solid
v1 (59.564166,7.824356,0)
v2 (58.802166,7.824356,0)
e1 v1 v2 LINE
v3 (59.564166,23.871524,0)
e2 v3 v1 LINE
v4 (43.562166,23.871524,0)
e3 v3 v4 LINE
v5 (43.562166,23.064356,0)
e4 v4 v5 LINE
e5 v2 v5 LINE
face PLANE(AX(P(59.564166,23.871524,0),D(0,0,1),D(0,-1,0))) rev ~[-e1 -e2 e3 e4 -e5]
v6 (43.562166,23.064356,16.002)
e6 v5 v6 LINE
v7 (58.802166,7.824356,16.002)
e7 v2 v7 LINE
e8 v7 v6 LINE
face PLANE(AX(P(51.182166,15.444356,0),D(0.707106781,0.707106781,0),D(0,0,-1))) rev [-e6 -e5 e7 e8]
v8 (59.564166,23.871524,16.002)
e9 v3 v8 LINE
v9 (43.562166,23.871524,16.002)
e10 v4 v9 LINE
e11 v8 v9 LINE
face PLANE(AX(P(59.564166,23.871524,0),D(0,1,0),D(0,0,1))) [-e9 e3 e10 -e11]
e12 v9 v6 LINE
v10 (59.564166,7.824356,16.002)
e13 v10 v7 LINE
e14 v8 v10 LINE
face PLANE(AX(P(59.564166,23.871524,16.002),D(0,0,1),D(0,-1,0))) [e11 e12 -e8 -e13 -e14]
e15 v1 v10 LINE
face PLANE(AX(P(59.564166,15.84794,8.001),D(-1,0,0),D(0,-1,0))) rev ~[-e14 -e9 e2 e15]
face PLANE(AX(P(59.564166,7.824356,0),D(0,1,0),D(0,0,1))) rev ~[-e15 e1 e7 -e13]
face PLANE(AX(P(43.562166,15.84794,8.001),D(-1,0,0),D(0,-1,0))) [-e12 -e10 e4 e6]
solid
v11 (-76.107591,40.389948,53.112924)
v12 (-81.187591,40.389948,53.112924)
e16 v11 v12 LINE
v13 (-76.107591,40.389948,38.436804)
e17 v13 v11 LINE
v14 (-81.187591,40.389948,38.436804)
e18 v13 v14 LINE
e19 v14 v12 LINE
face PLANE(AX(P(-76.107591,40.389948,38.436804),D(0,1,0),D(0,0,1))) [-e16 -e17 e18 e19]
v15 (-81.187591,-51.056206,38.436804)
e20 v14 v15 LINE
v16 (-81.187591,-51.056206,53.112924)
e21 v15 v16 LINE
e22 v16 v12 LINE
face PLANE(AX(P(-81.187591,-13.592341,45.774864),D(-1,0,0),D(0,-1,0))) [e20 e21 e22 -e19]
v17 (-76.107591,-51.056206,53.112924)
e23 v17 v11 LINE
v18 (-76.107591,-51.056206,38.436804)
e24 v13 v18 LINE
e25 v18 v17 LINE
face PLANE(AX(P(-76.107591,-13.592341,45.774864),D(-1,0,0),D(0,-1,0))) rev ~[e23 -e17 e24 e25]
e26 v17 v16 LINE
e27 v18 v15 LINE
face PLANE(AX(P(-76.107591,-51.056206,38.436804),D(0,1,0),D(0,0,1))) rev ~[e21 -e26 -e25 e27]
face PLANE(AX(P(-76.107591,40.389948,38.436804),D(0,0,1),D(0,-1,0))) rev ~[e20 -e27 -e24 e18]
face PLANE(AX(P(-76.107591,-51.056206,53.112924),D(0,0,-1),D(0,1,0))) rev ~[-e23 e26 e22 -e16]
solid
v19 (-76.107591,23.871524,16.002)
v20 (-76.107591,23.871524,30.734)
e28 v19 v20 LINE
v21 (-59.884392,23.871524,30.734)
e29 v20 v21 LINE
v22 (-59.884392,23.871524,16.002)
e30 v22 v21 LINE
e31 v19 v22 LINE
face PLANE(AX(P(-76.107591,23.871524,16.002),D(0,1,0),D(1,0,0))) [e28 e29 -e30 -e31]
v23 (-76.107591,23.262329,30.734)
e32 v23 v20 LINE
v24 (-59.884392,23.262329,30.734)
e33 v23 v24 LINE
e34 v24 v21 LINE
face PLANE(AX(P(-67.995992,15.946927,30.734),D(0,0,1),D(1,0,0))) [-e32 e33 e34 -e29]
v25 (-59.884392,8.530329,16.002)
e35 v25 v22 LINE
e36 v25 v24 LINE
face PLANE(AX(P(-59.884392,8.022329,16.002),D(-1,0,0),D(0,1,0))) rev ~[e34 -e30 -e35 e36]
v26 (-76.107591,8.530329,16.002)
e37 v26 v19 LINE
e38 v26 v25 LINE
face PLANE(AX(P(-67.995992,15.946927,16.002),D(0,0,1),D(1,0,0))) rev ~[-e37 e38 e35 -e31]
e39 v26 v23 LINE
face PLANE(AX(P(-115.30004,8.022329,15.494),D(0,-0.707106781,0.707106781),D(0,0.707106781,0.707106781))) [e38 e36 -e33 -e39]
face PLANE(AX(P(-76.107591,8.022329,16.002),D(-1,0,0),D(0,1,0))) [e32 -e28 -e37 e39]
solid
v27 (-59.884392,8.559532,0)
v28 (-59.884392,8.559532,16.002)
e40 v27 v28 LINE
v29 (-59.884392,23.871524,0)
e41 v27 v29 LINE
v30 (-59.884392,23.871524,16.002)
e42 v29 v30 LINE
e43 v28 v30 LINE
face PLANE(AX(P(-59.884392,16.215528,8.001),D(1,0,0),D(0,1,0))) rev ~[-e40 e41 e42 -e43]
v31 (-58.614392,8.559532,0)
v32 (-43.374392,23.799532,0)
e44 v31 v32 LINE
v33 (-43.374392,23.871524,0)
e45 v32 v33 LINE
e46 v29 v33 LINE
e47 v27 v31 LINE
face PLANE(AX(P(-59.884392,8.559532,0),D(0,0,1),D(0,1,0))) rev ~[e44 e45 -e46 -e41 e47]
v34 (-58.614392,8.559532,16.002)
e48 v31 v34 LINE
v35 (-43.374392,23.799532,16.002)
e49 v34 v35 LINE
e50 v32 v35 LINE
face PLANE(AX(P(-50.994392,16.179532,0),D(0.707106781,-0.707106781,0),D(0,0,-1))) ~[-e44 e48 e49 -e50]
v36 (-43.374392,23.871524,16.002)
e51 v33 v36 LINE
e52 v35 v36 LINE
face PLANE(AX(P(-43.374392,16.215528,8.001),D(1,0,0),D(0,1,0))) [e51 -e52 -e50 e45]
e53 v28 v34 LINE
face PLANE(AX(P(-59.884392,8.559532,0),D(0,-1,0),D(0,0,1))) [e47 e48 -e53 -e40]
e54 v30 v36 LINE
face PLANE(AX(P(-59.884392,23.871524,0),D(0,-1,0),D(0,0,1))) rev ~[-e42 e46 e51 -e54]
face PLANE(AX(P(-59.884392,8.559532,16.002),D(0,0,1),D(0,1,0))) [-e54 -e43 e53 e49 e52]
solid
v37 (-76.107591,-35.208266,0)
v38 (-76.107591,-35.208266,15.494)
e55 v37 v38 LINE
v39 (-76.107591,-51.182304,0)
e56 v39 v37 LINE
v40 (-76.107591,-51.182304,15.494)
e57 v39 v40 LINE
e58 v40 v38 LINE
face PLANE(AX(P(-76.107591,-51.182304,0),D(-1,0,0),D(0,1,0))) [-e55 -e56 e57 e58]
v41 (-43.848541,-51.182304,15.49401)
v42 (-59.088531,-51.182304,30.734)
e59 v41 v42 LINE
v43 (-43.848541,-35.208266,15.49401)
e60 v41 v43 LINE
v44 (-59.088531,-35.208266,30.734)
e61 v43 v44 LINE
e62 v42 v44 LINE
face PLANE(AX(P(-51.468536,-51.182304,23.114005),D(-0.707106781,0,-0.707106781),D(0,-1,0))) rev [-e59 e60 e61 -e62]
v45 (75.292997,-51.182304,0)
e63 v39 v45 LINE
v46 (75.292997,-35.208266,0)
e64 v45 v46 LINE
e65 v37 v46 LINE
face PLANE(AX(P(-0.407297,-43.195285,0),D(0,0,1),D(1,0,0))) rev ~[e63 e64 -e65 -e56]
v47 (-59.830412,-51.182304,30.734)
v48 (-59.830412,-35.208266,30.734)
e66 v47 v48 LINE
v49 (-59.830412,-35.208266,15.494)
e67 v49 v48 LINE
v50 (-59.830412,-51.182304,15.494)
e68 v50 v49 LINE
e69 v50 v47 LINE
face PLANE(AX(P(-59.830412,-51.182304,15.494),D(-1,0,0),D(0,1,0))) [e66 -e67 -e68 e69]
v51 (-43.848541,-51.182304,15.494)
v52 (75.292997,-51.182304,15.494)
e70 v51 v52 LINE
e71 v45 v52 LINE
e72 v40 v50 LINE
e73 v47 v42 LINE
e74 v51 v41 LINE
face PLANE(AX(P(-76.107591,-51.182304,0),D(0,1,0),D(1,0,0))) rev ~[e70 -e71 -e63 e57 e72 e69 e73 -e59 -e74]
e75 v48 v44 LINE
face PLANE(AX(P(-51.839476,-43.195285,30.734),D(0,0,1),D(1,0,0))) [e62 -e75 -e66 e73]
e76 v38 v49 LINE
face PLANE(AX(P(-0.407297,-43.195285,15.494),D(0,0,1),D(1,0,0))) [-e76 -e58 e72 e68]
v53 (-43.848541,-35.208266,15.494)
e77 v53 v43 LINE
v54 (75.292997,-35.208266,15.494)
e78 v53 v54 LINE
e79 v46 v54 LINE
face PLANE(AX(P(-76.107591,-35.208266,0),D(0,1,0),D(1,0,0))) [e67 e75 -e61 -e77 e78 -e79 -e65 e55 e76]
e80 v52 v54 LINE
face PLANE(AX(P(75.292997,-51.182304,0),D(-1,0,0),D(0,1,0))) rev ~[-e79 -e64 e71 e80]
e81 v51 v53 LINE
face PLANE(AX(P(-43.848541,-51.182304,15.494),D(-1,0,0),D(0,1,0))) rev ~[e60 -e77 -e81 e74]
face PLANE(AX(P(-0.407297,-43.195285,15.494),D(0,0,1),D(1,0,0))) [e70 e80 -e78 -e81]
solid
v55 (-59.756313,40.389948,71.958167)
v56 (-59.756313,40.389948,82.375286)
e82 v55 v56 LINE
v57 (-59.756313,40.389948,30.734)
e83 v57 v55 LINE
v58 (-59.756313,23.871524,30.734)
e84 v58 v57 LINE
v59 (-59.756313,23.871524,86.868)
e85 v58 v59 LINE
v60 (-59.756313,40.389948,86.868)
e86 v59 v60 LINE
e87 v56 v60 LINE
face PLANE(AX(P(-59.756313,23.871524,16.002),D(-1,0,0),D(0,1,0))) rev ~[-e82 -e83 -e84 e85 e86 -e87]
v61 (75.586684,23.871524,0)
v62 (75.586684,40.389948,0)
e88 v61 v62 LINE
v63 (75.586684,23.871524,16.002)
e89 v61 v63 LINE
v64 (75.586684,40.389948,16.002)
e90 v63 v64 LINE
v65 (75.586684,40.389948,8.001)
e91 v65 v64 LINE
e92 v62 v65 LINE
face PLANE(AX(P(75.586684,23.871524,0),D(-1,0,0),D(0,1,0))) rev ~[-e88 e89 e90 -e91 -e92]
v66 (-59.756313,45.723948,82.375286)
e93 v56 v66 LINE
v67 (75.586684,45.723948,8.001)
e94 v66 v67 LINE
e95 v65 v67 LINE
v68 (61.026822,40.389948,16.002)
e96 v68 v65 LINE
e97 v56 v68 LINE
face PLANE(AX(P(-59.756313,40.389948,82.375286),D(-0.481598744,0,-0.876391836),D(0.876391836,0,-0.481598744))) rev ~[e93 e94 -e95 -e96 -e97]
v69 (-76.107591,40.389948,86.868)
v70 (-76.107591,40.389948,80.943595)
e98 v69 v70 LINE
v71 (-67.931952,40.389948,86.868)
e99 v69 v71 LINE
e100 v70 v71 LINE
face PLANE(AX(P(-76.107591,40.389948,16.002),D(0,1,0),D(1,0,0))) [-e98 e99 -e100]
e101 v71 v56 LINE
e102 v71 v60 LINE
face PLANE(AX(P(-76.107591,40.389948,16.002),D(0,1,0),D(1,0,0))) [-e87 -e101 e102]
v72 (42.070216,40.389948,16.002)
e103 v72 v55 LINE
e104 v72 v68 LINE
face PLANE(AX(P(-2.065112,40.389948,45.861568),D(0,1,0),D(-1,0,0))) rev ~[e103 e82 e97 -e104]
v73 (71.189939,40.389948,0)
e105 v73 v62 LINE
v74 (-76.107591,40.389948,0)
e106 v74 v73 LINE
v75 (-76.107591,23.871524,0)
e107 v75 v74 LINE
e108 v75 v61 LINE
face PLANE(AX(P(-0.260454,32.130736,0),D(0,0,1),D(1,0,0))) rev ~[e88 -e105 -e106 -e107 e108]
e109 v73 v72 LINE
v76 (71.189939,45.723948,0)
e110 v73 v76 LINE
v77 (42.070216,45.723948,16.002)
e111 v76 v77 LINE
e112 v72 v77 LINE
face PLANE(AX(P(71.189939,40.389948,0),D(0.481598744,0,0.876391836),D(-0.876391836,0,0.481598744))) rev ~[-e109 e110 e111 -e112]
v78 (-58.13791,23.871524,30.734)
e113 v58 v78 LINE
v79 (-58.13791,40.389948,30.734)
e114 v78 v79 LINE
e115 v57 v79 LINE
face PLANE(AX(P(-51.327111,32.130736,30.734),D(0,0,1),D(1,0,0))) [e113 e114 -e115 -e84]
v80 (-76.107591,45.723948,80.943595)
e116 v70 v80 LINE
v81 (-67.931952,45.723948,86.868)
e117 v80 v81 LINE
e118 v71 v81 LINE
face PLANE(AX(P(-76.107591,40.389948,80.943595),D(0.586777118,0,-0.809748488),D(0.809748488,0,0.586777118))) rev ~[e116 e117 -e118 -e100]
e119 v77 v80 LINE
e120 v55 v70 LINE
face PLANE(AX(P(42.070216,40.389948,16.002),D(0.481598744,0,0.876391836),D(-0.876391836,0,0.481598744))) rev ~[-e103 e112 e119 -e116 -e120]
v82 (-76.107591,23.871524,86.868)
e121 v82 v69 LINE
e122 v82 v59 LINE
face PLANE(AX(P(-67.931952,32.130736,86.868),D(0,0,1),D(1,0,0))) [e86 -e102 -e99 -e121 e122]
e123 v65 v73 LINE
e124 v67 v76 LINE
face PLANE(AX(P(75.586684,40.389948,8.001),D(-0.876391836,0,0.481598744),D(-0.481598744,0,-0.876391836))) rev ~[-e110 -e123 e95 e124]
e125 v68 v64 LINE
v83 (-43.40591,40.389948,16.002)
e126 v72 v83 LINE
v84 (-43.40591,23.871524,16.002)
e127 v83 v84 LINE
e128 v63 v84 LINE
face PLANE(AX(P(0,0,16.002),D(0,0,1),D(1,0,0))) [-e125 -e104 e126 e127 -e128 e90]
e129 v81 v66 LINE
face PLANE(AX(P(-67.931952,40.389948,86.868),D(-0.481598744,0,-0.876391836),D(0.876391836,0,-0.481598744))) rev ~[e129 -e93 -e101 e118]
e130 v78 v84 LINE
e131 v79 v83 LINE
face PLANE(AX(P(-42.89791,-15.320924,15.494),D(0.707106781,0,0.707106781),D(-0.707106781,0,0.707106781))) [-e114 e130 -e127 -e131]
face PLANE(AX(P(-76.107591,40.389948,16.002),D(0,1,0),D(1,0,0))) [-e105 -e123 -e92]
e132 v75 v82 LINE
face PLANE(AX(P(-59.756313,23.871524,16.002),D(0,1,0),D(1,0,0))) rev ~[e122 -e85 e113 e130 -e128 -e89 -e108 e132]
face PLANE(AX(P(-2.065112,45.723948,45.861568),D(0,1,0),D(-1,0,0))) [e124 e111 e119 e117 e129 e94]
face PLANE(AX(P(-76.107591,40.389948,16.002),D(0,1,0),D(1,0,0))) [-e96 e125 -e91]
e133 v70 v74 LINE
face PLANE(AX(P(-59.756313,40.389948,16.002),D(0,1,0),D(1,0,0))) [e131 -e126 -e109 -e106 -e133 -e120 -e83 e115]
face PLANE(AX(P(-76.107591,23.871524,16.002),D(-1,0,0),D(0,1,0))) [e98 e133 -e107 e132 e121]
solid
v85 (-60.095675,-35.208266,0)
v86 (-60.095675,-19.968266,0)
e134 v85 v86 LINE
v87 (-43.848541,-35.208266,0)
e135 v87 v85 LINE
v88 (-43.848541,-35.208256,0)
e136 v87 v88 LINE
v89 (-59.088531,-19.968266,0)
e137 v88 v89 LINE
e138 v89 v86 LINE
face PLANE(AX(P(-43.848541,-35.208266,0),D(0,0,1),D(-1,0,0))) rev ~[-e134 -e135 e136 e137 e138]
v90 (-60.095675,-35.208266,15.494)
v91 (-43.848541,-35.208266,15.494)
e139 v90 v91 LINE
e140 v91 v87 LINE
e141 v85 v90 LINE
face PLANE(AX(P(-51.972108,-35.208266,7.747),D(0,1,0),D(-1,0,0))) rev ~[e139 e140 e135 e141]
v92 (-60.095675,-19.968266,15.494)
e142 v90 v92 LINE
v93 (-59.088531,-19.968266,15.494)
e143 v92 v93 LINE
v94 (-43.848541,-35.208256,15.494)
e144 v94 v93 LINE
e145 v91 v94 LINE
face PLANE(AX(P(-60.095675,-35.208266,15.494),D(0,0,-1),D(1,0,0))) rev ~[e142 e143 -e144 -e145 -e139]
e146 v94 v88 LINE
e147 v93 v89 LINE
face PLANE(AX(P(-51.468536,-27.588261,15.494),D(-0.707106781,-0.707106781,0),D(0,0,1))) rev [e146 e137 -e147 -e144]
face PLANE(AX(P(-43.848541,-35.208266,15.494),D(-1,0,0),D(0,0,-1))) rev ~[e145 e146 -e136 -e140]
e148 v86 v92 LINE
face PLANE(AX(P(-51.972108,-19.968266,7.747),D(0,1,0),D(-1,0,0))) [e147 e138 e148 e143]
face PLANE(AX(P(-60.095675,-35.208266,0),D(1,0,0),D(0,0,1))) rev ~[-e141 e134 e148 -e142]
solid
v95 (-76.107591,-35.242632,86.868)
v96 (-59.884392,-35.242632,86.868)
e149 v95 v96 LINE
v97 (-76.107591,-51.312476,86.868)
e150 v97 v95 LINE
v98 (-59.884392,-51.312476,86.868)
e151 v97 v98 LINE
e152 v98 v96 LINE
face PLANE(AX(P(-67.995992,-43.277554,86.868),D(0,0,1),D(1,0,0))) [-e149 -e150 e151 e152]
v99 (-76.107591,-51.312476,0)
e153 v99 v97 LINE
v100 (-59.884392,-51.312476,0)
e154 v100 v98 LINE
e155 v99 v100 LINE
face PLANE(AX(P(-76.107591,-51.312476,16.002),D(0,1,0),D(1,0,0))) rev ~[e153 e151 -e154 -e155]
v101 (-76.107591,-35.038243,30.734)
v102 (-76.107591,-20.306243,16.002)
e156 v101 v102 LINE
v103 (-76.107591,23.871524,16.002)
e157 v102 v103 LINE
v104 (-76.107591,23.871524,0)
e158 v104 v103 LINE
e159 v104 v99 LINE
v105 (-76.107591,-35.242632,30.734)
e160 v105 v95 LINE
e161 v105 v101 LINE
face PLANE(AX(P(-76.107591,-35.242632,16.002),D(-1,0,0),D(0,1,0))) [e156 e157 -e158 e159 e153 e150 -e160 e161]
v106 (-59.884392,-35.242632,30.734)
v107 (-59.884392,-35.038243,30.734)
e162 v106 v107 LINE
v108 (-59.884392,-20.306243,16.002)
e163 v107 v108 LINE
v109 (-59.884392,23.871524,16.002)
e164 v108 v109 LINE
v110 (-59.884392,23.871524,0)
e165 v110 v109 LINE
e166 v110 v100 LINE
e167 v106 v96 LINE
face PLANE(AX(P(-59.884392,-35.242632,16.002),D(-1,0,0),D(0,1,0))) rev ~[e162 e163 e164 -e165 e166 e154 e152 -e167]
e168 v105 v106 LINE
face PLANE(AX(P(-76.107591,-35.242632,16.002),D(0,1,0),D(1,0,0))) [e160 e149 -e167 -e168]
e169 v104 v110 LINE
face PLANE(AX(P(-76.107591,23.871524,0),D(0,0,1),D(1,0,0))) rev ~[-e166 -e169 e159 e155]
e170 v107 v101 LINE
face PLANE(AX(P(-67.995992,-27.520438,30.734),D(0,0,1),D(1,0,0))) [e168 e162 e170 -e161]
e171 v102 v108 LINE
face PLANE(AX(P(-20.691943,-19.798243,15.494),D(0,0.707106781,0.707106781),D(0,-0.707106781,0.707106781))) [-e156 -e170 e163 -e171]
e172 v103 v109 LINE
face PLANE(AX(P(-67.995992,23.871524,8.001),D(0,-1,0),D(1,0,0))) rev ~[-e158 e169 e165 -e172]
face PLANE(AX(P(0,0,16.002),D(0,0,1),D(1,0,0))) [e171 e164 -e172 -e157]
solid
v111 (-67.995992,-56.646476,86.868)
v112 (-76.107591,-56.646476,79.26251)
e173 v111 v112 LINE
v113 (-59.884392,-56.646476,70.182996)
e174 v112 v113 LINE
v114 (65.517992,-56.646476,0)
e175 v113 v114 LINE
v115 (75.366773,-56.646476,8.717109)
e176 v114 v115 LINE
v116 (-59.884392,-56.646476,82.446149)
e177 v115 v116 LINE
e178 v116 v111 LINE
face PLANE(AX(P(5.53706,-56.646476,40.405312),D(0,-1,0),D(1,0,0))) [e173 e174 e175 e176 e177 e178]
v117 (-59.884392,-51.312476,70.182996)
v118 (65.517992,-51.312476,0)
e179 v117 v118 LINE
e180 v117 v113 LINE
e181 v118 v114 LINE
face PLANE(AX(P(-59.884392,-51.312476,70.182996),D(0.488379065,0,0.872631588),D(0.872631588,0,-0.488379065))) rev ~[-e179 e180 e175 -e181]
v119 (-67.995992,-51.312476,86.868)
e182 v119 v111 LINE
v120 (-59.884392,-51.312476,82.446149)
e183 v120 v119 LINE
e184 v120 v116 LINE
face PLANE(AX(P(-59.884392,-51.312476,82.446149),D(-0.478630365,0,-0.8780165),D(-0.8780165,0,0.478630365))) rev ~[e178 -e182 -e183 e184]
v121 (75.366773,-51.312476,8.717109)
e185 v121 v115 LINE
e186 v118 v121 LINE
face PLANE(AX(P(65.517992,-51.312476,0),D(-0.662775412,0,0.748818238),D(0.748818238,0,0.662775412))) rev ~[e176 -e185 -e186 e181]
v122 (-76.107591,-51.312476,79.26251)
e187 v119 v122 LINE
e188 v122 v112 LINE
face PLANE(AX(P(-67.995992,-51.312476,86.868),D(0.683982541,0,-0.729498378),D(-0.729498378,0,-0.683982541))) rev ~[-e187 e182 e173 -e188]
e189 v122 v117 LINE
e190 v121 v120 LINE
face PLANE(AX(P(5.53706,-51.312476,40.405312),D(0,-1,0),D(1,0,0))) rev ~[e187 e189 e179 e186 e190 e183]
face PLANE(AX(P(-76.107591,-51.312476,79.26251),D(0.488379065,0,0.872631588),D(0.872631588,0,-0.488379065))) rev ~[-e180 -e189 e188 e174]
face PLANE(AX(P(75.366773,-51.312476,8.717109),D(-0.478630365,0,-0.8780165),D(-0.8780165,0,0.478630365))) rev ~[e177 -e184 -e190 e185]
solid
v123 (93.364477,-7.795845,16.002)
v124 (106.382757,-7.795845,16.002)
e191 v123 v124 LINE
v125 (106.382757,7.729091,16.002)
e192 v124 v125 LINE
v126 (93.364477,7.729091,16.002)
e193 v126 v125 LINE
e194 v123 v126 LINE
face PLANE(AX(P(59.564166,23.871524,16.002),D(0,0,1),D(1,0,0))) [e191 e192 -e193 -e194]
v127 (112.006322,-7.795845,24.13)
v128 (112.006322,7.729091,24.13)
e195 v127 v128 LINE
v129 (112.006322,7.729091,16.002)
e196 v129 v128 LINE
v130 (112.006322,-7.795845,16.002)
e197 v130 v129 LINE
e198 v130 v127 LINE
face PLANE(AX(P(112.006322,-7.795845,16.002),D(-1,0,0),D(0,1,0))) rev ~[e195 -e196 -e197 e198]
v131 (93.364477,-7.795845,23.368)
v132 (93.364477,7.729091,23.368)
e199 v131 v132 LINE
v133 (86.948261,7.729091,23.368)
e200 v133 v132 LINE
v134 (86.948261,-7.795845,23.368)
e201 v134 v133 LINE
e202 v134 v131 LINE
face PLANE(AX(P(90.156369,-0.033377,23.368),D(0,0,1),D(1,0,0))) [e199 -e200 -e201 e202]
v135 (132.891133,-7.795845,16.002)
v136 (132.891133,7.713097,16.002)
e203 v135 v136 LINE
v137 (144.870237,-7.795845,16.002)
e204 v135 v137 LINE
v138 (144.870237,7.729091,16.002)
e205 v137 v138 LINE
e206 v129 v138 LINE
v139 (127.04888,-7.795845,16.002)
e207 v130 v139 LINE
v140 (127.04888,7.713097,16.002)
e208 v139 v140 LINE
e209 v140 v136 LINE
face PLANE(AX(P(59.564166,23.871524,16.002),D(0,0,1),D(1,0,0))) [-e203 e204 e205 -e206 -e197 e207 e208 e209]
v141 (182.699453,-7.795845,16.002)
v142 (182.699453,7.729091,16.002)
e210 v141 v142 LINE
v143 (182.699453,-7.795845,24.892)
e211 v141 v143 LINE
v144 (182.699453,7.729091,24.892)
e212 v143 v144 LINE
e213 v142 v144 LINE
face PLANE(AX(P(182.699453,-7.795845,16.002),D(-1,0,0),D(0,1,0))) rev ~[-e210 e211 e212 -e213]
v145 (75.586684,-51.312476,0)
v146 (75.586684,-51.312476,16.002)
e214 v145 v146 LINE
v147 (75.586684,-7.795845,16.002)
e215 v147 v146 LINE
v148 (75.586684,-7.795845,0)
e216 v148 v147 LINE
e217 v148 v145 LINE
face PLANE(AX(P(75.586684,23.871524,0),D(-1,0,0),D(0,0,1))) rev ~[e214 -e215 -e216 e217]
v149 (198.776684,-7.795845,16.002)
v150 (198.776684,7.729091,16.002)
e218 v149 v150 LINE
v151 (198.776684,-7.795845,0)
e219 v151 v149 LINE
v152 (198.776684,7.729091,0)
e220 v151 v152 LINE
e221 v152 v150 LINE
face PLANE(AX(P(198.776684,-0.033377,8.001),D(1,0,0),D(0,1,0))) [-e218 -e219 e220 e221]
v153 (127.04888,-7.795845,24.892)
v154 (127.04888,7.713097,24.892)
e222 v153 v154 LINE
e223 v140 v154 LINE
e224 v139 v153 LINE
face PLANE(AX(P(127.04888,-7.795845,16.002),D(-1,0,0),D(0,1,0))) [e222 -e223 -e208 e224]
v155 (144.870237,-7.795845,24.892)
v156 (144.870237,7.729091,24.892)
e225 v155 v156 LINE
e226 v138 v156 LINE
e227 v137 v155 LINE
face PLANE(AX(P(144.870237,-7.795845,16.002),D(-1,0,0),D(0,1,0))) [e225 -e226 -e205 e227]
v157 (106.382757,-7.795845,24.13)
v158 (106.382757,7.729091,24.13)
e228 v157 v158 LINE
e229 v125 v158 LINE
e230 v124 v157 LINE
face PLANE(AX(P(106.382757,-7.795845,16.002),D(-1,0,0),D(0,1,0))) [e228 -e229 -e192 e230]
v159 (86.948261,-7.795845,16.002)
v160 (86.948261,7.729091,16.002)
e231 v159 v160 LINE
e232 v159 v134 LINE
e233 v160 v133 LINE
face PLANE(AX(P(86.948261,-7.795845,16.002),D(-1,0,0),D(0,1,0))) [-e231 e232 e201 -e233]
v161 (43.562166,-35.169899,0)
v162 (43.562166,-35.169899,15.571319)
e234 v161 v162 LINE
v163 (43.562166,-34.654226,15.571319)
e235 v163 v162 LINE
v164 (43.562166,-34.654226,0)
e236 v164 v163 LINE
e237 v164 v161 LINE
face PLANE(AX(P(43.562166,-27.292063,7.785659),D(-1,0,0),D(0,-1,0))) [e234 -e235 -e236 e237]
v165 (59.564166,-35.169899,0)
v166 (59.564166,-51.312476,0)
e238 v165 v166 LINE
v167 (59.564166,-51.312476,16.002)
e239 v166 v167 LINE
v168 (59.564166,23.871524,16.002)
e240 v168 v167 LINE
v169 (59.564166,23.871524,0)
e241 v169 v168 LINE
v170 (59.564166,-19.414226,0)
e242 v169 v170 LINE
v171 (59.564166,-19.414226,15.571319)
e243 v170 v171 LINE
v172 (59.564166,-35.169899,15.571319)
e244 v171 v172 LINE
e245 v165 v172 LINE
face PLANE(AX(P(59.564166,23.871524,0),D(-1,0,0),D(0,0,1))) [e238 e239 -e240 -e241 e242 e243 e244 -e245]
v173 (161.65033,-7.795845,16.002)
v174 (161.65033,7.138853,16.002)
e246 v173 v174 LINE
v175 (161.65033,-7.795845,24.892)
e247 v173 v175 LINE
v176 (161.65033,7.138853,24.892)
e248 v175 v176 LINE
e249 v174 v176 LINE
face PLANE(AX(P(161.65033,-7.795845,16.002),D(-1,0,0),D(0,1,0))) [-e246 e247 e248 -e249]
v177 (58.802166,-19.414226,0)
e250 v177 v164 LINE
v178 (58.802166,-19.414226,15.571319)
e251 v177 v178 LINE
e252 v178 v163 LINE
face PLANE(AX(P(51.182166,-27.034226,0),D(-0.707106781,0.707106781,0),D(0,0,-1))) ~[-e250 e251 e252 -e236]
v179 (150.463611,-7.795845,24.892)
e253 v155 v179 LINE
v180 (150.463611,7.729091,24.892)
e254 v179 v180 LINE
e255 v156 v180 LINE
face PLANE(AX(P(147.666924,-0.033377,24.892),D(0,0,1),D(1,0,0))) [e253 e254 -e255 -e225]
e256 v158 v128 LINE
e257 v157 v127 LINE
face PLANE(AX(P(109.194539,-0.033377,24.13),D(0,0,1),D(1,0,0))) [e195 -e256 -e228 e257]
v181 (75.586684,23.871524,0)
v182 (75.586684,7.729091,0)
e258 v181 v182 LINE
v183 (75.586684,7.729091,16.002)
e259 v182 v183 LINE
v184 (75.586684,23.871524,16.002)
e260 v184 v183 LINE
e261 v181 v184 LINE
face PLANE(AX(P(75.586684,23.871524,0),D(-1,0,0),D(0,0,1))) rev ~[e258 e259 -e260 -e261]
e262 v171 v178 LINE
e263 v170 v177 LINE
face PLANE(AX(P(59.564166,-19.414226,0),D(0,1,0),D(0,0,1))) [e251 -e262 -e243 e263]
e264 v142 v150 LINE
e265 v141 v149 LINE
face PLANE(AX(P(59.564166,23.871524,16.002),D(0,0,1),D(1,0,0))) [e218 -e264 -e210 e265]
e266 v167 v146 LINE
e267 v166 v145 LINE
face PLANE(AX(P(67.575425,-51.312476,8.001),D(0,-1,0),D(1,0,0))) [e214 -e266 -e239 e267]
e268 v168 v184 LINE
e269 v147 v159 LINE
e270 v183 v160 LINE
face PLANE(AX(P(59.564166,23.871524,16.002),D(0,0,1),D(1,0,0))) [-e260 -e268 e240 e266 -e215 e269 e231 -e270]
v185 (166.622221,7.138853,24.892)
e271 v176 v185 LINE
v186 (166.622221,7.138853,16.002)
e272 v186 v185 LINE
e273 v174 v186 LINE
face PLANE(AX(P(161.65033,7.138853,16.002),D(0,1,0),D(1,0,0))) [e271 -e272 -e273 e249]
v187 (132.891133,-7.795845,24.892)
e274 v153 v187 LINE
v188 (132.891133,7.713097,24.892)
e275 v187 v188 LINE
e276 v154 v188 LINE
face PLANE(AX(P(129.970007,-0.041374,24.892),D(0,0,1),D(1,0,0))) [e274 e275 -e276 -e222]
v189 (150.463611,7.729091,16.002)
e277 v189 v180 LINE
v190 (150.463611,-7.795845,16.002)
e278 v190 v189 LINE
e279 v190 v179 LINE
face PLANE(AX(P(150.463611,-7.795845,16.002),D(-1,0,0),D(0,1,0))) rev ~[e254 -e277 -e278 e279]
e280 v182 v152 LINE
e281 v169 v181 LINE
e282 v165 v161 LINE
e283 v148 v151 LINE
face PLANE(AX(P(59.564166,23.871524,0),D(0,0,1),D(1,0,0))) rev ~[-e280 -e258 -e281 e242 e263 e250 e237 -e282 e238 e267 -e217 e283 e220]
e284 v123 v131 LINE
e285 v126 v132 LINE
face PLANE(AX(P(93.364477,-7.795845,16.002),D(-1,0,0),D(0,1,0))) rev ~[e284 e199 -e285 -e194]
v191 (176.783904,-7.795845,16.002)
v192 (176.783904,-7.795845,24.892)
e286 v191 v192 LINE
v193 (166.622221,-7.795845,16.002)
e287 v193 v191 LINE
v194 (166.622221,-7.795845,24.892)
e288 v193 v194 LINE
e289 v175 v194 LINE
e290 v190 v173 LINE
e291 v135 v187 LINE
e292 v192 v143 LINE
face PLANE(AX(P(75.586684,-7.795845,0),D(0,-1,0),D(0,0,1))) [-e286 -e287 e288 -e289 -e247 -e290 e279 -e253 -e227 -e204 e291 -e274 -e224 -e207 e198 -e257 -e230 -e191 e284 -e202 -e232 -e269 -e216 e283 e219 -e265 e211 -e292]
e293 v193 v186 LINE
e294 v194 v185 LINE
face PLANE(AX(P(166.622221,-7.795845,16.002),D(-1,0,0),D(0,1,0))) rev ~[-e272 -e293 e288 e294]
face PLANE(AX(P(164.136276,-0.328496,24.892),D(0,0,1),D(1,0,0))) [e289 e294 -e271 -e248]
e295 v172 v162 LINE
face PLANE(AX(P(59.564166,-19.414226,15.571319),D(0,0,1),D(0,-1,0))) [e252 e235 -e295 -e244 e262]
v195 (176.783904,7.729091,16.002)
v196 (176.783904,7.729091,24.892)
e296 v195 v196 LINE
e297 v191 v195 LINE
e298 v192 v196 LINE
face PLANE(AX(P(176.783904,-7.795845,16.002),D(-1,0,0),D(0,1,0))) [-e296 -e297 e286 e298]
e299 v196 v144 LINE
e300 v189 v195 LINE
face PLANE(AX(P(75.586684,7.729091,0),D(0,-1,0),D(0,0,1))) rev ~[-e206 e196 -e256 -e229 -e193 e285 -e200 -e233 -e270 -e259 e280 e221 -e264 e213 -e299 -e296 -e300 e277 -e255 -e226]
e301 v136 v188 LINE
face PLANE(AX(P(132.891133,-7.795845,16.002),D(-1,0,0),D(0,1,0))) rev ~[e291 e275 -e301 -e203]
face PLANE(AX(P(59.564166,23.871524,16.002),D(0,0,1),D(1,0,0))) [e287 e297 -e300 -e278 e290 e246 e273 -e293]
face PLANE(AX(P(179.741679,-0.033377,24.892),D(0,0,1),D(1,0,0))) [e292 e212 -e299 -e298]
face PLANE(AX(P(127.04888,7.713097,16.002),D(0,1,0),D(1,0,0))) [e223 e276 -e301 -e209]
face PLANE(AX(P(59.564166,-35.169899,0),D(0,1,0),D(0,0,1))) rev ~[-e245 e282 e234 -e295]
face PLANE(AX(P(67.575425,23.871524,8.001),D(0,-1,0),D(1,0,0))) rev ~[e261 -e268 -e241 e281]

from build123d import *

# Parameters (mm, degrees)
F1_W         = 151.4005884528
F1_H         = 15.9740373492
F2_DEPTH     = 15.494
F3_W         = 151.6942754388
F3_H         = 16.5184233338
F4_DEPTH     = 16.002
F5_W         = 16.2231996655
F5_H         = 16.002
F6_DEPTH     = 75.184
F7_W         = 16.0225182772
F7_H         = 16.002
F8_DEPTH     = 75.184
F9_W         = 16.3512788713
F9_H         = 16.5184233338
F10_DEPTH    = 70.866
F11_W        = 16.2231996655
F11_H        = 16.0698437091
F12_DEPTH    = 70.866
F14_DEPTH    = 5.334
F16_DEPTH    = 5.334
F17_W        = 16.8584026396
F17_H        = 16.5184233338
F18_DEPTH    = 14.732
F19_W        = 74.9277304858
F19_H        = 14.6761201322
F19_W_2      = 16.5184233338
F20_DEPTH    = 5.08
F21_W        = 15.5249363743
F21_H        = 16.002
F22_DEPTH    = 123.19
F23_W        = 6.4162164927
F23_H        = 15.5249363743
F24_DEPTH    = 7.366
F25_W        = 5.6235641241
F25_H        = 15.5249363743
F27_DEPTH    = 8.128
F26_W        = 5.8422535658
F26_H        = 15.5089418404
F28_DEPTH    = 8.89
F29_W        = 5.5933743715
F29_H        = 15.5249363743
F31_DEPTH    = 8.89
F30_W        = 4.9718916416
F30_H        = 14.9346985854
F32_DEPTH    = 8.89
F33_W        = 5.9155483258
F33_H        = 15.5249363743
F34_DEPTH    = 8.89
F35_W        = 15.9818716347
F35_H        = 15.9740373492
F36_DEPTH    = 15.24
F37_SIZE     = 15.23999
F38_T4_DEPTH = 94.903320807
F39_W        = 16.2231996655
F39_H        = 15.4443886131
F40_DEPTH    = 14.732
F41_T4_DEPTH = 94.6080971387
F43_DEPTH    = 15.24
F44_SIZE     = 15.23999
F45_W        = 16.2231996655
F45_H        = 15.8491954207
F46_DEPTH    = 14.732
F47_T1_DEPTH = 94.6080971387
F48_W        = 15.3119927272
F48_H        = 16.002
F49_DEPTH    = 16.51
F50_SIZE     = 15.24
F51_W        = 16.0471685231
F51_H        = 16.002
F53_DEPTH    = 16.002
F52_W        = 15.7556738704
F52_H        = 15.5713185668
F54_DEPTH    = 16.002
F55_SIZE     = 15.24
F56_SIZE     = 15.24


# Not quite as in the source:
# - a fillet or chamfer that OpenCascade refuses, or shapes differently, is made with other operations: its cross-section is extruded or revolved along the edge and cut away or added
# - a fillet or chamfer is up to 0.001 mm smaller than in the source, because OpenCascade refuses the exact size


with BuildPart() as f2:
    # F1 (on face) → F2 (new body)
    with BuildSketch(Plane.XY):
        with Locations((-0.4072971642, -43.195284903)):
            Rectangle(F1_W, F1_H)
    extrude(amount=F2_DEPTH)

    # F35 (on face) → F36 (join)
    with BuildSketch(Plane.XY.offset(15.494)):
        with Locations((-51.8394764513, -43.195284903)):
            Rectangle(F35_W, F35_H)
    extrude(amount=F36_DEPTH)

    # F37 (size 15.24 in the source; OpenCascade refuses exactly that, so slightly less here)
    f37_edges = [f2.edges().sort_by_distance(p)[0] for p in [
        (-43.848541, -43.195285, 30.734),
    ]]
    chamfer(f37_edges, length=F37_SIZE)


with BuildPart() as f4:
    # F3 (on face) → F4 (new body)
    with BuildSketch(Plane.XY):
        with Locations((-0.2604536712, 32.1307359263)):
            Rectangle(F3_W, F3_H)
    extrude(amount=F4_DEPTH)

    # F9 (on face) → F10 (join)
    with BuildSketch(Plane.XY.offset(16.002)):
        with Locations((-67.931951955, 32.1307359263)):
            Rectangle(F9_W, F9_H)
    extrude(amount=F10_DEPTH)

    # F13 (on face) → F14 (join)
    with BuildSketch(Plane(origin=(0, 40.3899475932, 0), x_dir=(-1, 0, 0), z_dir=(0, 1, 0))):
        Polygon((59.7563125193, 71.958167232), (59.7563125193, 82.3752862081), (-61.0268224247, 16.002), (-42.0702156496, 16.002), align=None)
        Polygon((76.1075913906, 80.9435948159), (67.931951955, 86.868), (59.7563125193, 82.3752862081), (59.7563125193, 71.958167232), align=None)
        Polygon((-42.0702156496, 16.002), (-61.0268224247, 16.002), (-75.5866840482, 8.001), (-71.1899388967, 0), align=None)
    extrude(amount=F14_DEPTH)

    # F17 (on face) → F18 (join)
    with BuildSketch(Plane.XY.offset(16.002)):
        with Locations((-51.3271111995, 32.1307359263)):
            Rectangle(F17_W, F17_H)
    extrude(amount=F18_DEPTH)

    # F38: chamfer of 15.24 on 1 edges, made by hand


with BuildPart() as f6:
    # F5 (on face) → F6 (new body)
    with BuildSketch(Plane.XZ.offset(-23.8715242594)):
        with Locations((-67.9959915578, 8.001)):
            Rectangle(F5_W, F5_H)
    extrude(amount=F6_DEPTH)

    # F11 (on face) → F12 (join)
    with BuildSketch(Plane.XY.offset(16.002)):
        with Locations((-67.9959915578, -43.277553886)):
            Rectangle(F11_W, F11_H)
    extrude(amount=F12_DEPTH)

    # F39 (on face) → F40 (join)
    with BuildSketch(Plane.XY.offset(16.002)):
        with Locations((-67.9959915578, -27.5204377249)):
            Rectangle(F39_W, F39_H)
    extrude(amount=F40_DEPTH)

    # F41: chamfer of 15.24 on 1 edges, made by hand


with BuildPart() as f8:
    # F7 (on face) → F8 (new body)
    with BuildSketch(Plane.XZ.offset(-23.8715242594)):
        with Locations((67.5754249096, 8.001)):
            Rectangle(F7_W, F7_H)
    extrude(amount=F8_DEPTH)

    # F21 (on face) → F22 (join)
    with BuildSketch(Plane.YZ.offset(75.5866840482)):
        with Locations((-0.0333769713, 8.001)):
            Rectangle(F21_W, F21_H)
    extrude(amount=F22_DEPTH)

    # F23 (on face) → F24 (join)
    with BuildSketch(Plane.XY.offset(16.002)):
        with Locations((90.1563689113, -0.0333769713)):
            Rectangle(F23_W, F23_H)
    extrude(amount=F24_DEPTH)

    # F25 (on face) → F27 (join)
    with BuildSketch(Plane.XY.offset(16.002)):
        with Locations((109.1945394874, -0.0333769713)):
            Rectangle(F25_W, F25_H)
    extrude(amount=F27_DEPTH)

    # F26 (on face) → F28 (join)
    with BuildSketch(Plane.XY.offset(16.002)):
        with Locations((129.9700066447, -0.0413742382)):
            Rectangle(F26_W, F26_H)
    extrude(amount=F28_DEPTH)

    # F29 (on face) → F31 (join)
    with BuildSketch(Plane.XY.offset(16.002)):
        with Locations((147.6669237018, -0.0333769713)):
            Rectangle(F29_W, F29_H)
    extrude(amount=F31_DEPTH)

    # F30 (on face) → F32 (join)
    with BuildSketch(Plane.XY.offset(16.002)):
        with Locations((164.1362756491, -0.3284958657)):
            Rectangle(F30_W, F30_H)
    extrude(amount=F32_DEPTH)

    # F33 (on face) → F34 (join)
    with BuildSketch(Plane.XY.offset(16.002)):
        with Locations((179.7416785961, -0.0333769713)):
            Rectangle(F33_W, F33_H)
    extrude(amount=F34_DEPTH)

    # F52 (on face) → F54 (join)
    with BuildSketch(Plane(origin=(59.564165771, 0, 0), x_dir=(0, -1, 0), z_dir=(-1, 0, 0))):
        with Locations((27.2920625284, 7.7856592834)):
            Rectangle(F52_W, F52_H)
    extrude(amount=F54_DEPTH)

    # F56
    f56_edges = [f8.edges().sort_by_distance(p)[0] for p in [
        (43.562166, -19.414226, 7.785659),
    ]]
    chamfer(f56_edges, length=F56_SIZE)


with BuildPart() as f16:
    # F15 (on face) → F16 (new body)
    with BuildSketch(Plane.XZ.offset(51.3124757406)):
        Polygon((75.3667727113, 8.7171085179), (-59.8843917251, 82.4461491693), (-59.8843917251, 70.1829955211), (65.5179917812, 0), align=None)
        Polygon((-59.8843917251, 82.4461491693), (-67.9959915578, 86.868), (-76.1075913906, 79.2625099421), (-59.8843917251, 70.1829955211), align=None)
    extrude(amount=F16_DEPTH)


with BuildPart() as f20:
    # F19 (on face) → F20 (new body)
    with BuildSketch(Plane(origin=(-76.1075913906, 0, 0), x_dir=(0, -1, 0), z_dir=(-1, 0, 0))):
        with Locations((13.5923409835, 45.7748640329)):
            Rectangle(F19_W, F19_H)
        with Locations((-32.1307359263, 45.7748640329)):
            Rectangle(F19_W_2, F19_H)
    extrude(amount=F20_DEPTH)


with BuildPart() as f38_tool2:
    # F38_s3 → F38_t4 (new body)
    with BuildSketch(Plane.XZ.offset(15.3209244772)):
        Polygon((-42.8979098797, 15.494), (-58.1379098797, 30.734), (-42.8979098797, 30.734), align=None)
    extrude(amount=-F38_T4_DEPTH)

    split(bisect_by=Plane.XY.offset(16.002), keep=Keep.TOP)


with BuildPart() as f4_1:
    add(f4.part)

    # F38_t1: cut F38_tool2
    add(f38_tool2.part, mode=Mode.SUBTRACT)


with BuildPart() as f41_tool2:
    # F41_s3 → F41_t4 (new body)
    with BuildSketch(Plane.YZ.offset(-20.6919429885)):
        Polygon((-19.7982434183, 15.494), (-35.0382434183, 30.734), (-19.7982434183, 30.734), align=None)
    extrude(amount=-F41_T4_DEPTH)

    split(bisect_by=Plane.XY.offset(16.002), keep=Keep.TOP)


with BuildPart() as f6_1:
    add(f6.part)

    # F41_t1: cut F41_tool2
    add(f41_tool2.part, mode=Mode.SUBTRACT)


with BuildPart() as f43:
    # F42 (on face) → F43 (new body)
    with BuildSketch(Plane(origin=(0, -35.2082662284, 0), x_dir=(-1, 0, 0), z_dir=(0, 1, 0))):
        Polygon((43.8485406339, 0), (60.0956752896, 0), (60.0956752896, 15.494), (59.8304122686, 15.494), (43.8485406339, 15.494), align=None)
    extrude(amount=F43_DEPTH)

    # F44 (size 15.24 in the source; OpenCascade refuses exactly that, so slightly less here)
    f44_edges = [f43.edges().sort_by_distance(p)[0] for p in [
        (-43.848541, -19.968266, 7.747),
    ]]
    chamfer(f44_edges, length=F44_SIZE)


with BuildPart() as f46:
    # F45 (on face) → F46 (new body)
    with BuildSketch(Plane.XY.offset(16.002)):
        with Locations((-67.9959915578, 15.9469265491)):
            Rectangle(F45_W, F45_H)
    extrude(amount=F46_DEPTH)

    # F47: chamfer of 15.24 on 1 edges, made by hand

    # F47_s2 → F47_t1 (cut)
    with BuildSketch(Plane.YZ.offset(-115.3000401272)):
        Polygon((8.0223288387, 15.494), (23.2623288387, 30.734), (8.0223288387, 30.734), align=None)
    extrude(amount=F47_T1_DEPTH, mode=Mode.SUBTRACT)


with BuildPart() as f49:
    # F48 (on face) → F49 (new body)
    with BuildSketch(Plane.YZ.offset(-59.8843917251)):
        with Locations((16.2155278958, 8.001)):
            Rectangle(F48_W, F48_H)
    extrude(amount=F49_DEPTH)

    # F50
    f50_edges = [f49.edges().sort_by_distance(p)[0] for p in [
        (-43.374392, 8.559532, 8.001),
    ]]
    chamfer(f50_edges, length=F50_SIZE)


with BuildPart() as f53:
    # F51 (on face) → F53 (new body)
    with BuildSketch(Plane(origin=(59.564165771, 0, 0), x_dir=(0, -1, 0), z_dir=(-1, 0, 0))):
        with Locations((-15.8479399979, 8.001)):
            Rectangle(F51_W, F51_H)
    extrude(amount=F53_DEPTH)

    # F55
    f55_edges = [f53.edges().sort_by_distance(p)[0] for p in [
        (43.562166, 7.824356, 8.001),
    ]]
    chamfer(f55_edges, length=F55_SIZE)


solid = Compound([f2.part, f8.part, f16.part, f20.part, f4_1.part, f6_1.part, f43.part, f46.part, f49.part, f53.part])
